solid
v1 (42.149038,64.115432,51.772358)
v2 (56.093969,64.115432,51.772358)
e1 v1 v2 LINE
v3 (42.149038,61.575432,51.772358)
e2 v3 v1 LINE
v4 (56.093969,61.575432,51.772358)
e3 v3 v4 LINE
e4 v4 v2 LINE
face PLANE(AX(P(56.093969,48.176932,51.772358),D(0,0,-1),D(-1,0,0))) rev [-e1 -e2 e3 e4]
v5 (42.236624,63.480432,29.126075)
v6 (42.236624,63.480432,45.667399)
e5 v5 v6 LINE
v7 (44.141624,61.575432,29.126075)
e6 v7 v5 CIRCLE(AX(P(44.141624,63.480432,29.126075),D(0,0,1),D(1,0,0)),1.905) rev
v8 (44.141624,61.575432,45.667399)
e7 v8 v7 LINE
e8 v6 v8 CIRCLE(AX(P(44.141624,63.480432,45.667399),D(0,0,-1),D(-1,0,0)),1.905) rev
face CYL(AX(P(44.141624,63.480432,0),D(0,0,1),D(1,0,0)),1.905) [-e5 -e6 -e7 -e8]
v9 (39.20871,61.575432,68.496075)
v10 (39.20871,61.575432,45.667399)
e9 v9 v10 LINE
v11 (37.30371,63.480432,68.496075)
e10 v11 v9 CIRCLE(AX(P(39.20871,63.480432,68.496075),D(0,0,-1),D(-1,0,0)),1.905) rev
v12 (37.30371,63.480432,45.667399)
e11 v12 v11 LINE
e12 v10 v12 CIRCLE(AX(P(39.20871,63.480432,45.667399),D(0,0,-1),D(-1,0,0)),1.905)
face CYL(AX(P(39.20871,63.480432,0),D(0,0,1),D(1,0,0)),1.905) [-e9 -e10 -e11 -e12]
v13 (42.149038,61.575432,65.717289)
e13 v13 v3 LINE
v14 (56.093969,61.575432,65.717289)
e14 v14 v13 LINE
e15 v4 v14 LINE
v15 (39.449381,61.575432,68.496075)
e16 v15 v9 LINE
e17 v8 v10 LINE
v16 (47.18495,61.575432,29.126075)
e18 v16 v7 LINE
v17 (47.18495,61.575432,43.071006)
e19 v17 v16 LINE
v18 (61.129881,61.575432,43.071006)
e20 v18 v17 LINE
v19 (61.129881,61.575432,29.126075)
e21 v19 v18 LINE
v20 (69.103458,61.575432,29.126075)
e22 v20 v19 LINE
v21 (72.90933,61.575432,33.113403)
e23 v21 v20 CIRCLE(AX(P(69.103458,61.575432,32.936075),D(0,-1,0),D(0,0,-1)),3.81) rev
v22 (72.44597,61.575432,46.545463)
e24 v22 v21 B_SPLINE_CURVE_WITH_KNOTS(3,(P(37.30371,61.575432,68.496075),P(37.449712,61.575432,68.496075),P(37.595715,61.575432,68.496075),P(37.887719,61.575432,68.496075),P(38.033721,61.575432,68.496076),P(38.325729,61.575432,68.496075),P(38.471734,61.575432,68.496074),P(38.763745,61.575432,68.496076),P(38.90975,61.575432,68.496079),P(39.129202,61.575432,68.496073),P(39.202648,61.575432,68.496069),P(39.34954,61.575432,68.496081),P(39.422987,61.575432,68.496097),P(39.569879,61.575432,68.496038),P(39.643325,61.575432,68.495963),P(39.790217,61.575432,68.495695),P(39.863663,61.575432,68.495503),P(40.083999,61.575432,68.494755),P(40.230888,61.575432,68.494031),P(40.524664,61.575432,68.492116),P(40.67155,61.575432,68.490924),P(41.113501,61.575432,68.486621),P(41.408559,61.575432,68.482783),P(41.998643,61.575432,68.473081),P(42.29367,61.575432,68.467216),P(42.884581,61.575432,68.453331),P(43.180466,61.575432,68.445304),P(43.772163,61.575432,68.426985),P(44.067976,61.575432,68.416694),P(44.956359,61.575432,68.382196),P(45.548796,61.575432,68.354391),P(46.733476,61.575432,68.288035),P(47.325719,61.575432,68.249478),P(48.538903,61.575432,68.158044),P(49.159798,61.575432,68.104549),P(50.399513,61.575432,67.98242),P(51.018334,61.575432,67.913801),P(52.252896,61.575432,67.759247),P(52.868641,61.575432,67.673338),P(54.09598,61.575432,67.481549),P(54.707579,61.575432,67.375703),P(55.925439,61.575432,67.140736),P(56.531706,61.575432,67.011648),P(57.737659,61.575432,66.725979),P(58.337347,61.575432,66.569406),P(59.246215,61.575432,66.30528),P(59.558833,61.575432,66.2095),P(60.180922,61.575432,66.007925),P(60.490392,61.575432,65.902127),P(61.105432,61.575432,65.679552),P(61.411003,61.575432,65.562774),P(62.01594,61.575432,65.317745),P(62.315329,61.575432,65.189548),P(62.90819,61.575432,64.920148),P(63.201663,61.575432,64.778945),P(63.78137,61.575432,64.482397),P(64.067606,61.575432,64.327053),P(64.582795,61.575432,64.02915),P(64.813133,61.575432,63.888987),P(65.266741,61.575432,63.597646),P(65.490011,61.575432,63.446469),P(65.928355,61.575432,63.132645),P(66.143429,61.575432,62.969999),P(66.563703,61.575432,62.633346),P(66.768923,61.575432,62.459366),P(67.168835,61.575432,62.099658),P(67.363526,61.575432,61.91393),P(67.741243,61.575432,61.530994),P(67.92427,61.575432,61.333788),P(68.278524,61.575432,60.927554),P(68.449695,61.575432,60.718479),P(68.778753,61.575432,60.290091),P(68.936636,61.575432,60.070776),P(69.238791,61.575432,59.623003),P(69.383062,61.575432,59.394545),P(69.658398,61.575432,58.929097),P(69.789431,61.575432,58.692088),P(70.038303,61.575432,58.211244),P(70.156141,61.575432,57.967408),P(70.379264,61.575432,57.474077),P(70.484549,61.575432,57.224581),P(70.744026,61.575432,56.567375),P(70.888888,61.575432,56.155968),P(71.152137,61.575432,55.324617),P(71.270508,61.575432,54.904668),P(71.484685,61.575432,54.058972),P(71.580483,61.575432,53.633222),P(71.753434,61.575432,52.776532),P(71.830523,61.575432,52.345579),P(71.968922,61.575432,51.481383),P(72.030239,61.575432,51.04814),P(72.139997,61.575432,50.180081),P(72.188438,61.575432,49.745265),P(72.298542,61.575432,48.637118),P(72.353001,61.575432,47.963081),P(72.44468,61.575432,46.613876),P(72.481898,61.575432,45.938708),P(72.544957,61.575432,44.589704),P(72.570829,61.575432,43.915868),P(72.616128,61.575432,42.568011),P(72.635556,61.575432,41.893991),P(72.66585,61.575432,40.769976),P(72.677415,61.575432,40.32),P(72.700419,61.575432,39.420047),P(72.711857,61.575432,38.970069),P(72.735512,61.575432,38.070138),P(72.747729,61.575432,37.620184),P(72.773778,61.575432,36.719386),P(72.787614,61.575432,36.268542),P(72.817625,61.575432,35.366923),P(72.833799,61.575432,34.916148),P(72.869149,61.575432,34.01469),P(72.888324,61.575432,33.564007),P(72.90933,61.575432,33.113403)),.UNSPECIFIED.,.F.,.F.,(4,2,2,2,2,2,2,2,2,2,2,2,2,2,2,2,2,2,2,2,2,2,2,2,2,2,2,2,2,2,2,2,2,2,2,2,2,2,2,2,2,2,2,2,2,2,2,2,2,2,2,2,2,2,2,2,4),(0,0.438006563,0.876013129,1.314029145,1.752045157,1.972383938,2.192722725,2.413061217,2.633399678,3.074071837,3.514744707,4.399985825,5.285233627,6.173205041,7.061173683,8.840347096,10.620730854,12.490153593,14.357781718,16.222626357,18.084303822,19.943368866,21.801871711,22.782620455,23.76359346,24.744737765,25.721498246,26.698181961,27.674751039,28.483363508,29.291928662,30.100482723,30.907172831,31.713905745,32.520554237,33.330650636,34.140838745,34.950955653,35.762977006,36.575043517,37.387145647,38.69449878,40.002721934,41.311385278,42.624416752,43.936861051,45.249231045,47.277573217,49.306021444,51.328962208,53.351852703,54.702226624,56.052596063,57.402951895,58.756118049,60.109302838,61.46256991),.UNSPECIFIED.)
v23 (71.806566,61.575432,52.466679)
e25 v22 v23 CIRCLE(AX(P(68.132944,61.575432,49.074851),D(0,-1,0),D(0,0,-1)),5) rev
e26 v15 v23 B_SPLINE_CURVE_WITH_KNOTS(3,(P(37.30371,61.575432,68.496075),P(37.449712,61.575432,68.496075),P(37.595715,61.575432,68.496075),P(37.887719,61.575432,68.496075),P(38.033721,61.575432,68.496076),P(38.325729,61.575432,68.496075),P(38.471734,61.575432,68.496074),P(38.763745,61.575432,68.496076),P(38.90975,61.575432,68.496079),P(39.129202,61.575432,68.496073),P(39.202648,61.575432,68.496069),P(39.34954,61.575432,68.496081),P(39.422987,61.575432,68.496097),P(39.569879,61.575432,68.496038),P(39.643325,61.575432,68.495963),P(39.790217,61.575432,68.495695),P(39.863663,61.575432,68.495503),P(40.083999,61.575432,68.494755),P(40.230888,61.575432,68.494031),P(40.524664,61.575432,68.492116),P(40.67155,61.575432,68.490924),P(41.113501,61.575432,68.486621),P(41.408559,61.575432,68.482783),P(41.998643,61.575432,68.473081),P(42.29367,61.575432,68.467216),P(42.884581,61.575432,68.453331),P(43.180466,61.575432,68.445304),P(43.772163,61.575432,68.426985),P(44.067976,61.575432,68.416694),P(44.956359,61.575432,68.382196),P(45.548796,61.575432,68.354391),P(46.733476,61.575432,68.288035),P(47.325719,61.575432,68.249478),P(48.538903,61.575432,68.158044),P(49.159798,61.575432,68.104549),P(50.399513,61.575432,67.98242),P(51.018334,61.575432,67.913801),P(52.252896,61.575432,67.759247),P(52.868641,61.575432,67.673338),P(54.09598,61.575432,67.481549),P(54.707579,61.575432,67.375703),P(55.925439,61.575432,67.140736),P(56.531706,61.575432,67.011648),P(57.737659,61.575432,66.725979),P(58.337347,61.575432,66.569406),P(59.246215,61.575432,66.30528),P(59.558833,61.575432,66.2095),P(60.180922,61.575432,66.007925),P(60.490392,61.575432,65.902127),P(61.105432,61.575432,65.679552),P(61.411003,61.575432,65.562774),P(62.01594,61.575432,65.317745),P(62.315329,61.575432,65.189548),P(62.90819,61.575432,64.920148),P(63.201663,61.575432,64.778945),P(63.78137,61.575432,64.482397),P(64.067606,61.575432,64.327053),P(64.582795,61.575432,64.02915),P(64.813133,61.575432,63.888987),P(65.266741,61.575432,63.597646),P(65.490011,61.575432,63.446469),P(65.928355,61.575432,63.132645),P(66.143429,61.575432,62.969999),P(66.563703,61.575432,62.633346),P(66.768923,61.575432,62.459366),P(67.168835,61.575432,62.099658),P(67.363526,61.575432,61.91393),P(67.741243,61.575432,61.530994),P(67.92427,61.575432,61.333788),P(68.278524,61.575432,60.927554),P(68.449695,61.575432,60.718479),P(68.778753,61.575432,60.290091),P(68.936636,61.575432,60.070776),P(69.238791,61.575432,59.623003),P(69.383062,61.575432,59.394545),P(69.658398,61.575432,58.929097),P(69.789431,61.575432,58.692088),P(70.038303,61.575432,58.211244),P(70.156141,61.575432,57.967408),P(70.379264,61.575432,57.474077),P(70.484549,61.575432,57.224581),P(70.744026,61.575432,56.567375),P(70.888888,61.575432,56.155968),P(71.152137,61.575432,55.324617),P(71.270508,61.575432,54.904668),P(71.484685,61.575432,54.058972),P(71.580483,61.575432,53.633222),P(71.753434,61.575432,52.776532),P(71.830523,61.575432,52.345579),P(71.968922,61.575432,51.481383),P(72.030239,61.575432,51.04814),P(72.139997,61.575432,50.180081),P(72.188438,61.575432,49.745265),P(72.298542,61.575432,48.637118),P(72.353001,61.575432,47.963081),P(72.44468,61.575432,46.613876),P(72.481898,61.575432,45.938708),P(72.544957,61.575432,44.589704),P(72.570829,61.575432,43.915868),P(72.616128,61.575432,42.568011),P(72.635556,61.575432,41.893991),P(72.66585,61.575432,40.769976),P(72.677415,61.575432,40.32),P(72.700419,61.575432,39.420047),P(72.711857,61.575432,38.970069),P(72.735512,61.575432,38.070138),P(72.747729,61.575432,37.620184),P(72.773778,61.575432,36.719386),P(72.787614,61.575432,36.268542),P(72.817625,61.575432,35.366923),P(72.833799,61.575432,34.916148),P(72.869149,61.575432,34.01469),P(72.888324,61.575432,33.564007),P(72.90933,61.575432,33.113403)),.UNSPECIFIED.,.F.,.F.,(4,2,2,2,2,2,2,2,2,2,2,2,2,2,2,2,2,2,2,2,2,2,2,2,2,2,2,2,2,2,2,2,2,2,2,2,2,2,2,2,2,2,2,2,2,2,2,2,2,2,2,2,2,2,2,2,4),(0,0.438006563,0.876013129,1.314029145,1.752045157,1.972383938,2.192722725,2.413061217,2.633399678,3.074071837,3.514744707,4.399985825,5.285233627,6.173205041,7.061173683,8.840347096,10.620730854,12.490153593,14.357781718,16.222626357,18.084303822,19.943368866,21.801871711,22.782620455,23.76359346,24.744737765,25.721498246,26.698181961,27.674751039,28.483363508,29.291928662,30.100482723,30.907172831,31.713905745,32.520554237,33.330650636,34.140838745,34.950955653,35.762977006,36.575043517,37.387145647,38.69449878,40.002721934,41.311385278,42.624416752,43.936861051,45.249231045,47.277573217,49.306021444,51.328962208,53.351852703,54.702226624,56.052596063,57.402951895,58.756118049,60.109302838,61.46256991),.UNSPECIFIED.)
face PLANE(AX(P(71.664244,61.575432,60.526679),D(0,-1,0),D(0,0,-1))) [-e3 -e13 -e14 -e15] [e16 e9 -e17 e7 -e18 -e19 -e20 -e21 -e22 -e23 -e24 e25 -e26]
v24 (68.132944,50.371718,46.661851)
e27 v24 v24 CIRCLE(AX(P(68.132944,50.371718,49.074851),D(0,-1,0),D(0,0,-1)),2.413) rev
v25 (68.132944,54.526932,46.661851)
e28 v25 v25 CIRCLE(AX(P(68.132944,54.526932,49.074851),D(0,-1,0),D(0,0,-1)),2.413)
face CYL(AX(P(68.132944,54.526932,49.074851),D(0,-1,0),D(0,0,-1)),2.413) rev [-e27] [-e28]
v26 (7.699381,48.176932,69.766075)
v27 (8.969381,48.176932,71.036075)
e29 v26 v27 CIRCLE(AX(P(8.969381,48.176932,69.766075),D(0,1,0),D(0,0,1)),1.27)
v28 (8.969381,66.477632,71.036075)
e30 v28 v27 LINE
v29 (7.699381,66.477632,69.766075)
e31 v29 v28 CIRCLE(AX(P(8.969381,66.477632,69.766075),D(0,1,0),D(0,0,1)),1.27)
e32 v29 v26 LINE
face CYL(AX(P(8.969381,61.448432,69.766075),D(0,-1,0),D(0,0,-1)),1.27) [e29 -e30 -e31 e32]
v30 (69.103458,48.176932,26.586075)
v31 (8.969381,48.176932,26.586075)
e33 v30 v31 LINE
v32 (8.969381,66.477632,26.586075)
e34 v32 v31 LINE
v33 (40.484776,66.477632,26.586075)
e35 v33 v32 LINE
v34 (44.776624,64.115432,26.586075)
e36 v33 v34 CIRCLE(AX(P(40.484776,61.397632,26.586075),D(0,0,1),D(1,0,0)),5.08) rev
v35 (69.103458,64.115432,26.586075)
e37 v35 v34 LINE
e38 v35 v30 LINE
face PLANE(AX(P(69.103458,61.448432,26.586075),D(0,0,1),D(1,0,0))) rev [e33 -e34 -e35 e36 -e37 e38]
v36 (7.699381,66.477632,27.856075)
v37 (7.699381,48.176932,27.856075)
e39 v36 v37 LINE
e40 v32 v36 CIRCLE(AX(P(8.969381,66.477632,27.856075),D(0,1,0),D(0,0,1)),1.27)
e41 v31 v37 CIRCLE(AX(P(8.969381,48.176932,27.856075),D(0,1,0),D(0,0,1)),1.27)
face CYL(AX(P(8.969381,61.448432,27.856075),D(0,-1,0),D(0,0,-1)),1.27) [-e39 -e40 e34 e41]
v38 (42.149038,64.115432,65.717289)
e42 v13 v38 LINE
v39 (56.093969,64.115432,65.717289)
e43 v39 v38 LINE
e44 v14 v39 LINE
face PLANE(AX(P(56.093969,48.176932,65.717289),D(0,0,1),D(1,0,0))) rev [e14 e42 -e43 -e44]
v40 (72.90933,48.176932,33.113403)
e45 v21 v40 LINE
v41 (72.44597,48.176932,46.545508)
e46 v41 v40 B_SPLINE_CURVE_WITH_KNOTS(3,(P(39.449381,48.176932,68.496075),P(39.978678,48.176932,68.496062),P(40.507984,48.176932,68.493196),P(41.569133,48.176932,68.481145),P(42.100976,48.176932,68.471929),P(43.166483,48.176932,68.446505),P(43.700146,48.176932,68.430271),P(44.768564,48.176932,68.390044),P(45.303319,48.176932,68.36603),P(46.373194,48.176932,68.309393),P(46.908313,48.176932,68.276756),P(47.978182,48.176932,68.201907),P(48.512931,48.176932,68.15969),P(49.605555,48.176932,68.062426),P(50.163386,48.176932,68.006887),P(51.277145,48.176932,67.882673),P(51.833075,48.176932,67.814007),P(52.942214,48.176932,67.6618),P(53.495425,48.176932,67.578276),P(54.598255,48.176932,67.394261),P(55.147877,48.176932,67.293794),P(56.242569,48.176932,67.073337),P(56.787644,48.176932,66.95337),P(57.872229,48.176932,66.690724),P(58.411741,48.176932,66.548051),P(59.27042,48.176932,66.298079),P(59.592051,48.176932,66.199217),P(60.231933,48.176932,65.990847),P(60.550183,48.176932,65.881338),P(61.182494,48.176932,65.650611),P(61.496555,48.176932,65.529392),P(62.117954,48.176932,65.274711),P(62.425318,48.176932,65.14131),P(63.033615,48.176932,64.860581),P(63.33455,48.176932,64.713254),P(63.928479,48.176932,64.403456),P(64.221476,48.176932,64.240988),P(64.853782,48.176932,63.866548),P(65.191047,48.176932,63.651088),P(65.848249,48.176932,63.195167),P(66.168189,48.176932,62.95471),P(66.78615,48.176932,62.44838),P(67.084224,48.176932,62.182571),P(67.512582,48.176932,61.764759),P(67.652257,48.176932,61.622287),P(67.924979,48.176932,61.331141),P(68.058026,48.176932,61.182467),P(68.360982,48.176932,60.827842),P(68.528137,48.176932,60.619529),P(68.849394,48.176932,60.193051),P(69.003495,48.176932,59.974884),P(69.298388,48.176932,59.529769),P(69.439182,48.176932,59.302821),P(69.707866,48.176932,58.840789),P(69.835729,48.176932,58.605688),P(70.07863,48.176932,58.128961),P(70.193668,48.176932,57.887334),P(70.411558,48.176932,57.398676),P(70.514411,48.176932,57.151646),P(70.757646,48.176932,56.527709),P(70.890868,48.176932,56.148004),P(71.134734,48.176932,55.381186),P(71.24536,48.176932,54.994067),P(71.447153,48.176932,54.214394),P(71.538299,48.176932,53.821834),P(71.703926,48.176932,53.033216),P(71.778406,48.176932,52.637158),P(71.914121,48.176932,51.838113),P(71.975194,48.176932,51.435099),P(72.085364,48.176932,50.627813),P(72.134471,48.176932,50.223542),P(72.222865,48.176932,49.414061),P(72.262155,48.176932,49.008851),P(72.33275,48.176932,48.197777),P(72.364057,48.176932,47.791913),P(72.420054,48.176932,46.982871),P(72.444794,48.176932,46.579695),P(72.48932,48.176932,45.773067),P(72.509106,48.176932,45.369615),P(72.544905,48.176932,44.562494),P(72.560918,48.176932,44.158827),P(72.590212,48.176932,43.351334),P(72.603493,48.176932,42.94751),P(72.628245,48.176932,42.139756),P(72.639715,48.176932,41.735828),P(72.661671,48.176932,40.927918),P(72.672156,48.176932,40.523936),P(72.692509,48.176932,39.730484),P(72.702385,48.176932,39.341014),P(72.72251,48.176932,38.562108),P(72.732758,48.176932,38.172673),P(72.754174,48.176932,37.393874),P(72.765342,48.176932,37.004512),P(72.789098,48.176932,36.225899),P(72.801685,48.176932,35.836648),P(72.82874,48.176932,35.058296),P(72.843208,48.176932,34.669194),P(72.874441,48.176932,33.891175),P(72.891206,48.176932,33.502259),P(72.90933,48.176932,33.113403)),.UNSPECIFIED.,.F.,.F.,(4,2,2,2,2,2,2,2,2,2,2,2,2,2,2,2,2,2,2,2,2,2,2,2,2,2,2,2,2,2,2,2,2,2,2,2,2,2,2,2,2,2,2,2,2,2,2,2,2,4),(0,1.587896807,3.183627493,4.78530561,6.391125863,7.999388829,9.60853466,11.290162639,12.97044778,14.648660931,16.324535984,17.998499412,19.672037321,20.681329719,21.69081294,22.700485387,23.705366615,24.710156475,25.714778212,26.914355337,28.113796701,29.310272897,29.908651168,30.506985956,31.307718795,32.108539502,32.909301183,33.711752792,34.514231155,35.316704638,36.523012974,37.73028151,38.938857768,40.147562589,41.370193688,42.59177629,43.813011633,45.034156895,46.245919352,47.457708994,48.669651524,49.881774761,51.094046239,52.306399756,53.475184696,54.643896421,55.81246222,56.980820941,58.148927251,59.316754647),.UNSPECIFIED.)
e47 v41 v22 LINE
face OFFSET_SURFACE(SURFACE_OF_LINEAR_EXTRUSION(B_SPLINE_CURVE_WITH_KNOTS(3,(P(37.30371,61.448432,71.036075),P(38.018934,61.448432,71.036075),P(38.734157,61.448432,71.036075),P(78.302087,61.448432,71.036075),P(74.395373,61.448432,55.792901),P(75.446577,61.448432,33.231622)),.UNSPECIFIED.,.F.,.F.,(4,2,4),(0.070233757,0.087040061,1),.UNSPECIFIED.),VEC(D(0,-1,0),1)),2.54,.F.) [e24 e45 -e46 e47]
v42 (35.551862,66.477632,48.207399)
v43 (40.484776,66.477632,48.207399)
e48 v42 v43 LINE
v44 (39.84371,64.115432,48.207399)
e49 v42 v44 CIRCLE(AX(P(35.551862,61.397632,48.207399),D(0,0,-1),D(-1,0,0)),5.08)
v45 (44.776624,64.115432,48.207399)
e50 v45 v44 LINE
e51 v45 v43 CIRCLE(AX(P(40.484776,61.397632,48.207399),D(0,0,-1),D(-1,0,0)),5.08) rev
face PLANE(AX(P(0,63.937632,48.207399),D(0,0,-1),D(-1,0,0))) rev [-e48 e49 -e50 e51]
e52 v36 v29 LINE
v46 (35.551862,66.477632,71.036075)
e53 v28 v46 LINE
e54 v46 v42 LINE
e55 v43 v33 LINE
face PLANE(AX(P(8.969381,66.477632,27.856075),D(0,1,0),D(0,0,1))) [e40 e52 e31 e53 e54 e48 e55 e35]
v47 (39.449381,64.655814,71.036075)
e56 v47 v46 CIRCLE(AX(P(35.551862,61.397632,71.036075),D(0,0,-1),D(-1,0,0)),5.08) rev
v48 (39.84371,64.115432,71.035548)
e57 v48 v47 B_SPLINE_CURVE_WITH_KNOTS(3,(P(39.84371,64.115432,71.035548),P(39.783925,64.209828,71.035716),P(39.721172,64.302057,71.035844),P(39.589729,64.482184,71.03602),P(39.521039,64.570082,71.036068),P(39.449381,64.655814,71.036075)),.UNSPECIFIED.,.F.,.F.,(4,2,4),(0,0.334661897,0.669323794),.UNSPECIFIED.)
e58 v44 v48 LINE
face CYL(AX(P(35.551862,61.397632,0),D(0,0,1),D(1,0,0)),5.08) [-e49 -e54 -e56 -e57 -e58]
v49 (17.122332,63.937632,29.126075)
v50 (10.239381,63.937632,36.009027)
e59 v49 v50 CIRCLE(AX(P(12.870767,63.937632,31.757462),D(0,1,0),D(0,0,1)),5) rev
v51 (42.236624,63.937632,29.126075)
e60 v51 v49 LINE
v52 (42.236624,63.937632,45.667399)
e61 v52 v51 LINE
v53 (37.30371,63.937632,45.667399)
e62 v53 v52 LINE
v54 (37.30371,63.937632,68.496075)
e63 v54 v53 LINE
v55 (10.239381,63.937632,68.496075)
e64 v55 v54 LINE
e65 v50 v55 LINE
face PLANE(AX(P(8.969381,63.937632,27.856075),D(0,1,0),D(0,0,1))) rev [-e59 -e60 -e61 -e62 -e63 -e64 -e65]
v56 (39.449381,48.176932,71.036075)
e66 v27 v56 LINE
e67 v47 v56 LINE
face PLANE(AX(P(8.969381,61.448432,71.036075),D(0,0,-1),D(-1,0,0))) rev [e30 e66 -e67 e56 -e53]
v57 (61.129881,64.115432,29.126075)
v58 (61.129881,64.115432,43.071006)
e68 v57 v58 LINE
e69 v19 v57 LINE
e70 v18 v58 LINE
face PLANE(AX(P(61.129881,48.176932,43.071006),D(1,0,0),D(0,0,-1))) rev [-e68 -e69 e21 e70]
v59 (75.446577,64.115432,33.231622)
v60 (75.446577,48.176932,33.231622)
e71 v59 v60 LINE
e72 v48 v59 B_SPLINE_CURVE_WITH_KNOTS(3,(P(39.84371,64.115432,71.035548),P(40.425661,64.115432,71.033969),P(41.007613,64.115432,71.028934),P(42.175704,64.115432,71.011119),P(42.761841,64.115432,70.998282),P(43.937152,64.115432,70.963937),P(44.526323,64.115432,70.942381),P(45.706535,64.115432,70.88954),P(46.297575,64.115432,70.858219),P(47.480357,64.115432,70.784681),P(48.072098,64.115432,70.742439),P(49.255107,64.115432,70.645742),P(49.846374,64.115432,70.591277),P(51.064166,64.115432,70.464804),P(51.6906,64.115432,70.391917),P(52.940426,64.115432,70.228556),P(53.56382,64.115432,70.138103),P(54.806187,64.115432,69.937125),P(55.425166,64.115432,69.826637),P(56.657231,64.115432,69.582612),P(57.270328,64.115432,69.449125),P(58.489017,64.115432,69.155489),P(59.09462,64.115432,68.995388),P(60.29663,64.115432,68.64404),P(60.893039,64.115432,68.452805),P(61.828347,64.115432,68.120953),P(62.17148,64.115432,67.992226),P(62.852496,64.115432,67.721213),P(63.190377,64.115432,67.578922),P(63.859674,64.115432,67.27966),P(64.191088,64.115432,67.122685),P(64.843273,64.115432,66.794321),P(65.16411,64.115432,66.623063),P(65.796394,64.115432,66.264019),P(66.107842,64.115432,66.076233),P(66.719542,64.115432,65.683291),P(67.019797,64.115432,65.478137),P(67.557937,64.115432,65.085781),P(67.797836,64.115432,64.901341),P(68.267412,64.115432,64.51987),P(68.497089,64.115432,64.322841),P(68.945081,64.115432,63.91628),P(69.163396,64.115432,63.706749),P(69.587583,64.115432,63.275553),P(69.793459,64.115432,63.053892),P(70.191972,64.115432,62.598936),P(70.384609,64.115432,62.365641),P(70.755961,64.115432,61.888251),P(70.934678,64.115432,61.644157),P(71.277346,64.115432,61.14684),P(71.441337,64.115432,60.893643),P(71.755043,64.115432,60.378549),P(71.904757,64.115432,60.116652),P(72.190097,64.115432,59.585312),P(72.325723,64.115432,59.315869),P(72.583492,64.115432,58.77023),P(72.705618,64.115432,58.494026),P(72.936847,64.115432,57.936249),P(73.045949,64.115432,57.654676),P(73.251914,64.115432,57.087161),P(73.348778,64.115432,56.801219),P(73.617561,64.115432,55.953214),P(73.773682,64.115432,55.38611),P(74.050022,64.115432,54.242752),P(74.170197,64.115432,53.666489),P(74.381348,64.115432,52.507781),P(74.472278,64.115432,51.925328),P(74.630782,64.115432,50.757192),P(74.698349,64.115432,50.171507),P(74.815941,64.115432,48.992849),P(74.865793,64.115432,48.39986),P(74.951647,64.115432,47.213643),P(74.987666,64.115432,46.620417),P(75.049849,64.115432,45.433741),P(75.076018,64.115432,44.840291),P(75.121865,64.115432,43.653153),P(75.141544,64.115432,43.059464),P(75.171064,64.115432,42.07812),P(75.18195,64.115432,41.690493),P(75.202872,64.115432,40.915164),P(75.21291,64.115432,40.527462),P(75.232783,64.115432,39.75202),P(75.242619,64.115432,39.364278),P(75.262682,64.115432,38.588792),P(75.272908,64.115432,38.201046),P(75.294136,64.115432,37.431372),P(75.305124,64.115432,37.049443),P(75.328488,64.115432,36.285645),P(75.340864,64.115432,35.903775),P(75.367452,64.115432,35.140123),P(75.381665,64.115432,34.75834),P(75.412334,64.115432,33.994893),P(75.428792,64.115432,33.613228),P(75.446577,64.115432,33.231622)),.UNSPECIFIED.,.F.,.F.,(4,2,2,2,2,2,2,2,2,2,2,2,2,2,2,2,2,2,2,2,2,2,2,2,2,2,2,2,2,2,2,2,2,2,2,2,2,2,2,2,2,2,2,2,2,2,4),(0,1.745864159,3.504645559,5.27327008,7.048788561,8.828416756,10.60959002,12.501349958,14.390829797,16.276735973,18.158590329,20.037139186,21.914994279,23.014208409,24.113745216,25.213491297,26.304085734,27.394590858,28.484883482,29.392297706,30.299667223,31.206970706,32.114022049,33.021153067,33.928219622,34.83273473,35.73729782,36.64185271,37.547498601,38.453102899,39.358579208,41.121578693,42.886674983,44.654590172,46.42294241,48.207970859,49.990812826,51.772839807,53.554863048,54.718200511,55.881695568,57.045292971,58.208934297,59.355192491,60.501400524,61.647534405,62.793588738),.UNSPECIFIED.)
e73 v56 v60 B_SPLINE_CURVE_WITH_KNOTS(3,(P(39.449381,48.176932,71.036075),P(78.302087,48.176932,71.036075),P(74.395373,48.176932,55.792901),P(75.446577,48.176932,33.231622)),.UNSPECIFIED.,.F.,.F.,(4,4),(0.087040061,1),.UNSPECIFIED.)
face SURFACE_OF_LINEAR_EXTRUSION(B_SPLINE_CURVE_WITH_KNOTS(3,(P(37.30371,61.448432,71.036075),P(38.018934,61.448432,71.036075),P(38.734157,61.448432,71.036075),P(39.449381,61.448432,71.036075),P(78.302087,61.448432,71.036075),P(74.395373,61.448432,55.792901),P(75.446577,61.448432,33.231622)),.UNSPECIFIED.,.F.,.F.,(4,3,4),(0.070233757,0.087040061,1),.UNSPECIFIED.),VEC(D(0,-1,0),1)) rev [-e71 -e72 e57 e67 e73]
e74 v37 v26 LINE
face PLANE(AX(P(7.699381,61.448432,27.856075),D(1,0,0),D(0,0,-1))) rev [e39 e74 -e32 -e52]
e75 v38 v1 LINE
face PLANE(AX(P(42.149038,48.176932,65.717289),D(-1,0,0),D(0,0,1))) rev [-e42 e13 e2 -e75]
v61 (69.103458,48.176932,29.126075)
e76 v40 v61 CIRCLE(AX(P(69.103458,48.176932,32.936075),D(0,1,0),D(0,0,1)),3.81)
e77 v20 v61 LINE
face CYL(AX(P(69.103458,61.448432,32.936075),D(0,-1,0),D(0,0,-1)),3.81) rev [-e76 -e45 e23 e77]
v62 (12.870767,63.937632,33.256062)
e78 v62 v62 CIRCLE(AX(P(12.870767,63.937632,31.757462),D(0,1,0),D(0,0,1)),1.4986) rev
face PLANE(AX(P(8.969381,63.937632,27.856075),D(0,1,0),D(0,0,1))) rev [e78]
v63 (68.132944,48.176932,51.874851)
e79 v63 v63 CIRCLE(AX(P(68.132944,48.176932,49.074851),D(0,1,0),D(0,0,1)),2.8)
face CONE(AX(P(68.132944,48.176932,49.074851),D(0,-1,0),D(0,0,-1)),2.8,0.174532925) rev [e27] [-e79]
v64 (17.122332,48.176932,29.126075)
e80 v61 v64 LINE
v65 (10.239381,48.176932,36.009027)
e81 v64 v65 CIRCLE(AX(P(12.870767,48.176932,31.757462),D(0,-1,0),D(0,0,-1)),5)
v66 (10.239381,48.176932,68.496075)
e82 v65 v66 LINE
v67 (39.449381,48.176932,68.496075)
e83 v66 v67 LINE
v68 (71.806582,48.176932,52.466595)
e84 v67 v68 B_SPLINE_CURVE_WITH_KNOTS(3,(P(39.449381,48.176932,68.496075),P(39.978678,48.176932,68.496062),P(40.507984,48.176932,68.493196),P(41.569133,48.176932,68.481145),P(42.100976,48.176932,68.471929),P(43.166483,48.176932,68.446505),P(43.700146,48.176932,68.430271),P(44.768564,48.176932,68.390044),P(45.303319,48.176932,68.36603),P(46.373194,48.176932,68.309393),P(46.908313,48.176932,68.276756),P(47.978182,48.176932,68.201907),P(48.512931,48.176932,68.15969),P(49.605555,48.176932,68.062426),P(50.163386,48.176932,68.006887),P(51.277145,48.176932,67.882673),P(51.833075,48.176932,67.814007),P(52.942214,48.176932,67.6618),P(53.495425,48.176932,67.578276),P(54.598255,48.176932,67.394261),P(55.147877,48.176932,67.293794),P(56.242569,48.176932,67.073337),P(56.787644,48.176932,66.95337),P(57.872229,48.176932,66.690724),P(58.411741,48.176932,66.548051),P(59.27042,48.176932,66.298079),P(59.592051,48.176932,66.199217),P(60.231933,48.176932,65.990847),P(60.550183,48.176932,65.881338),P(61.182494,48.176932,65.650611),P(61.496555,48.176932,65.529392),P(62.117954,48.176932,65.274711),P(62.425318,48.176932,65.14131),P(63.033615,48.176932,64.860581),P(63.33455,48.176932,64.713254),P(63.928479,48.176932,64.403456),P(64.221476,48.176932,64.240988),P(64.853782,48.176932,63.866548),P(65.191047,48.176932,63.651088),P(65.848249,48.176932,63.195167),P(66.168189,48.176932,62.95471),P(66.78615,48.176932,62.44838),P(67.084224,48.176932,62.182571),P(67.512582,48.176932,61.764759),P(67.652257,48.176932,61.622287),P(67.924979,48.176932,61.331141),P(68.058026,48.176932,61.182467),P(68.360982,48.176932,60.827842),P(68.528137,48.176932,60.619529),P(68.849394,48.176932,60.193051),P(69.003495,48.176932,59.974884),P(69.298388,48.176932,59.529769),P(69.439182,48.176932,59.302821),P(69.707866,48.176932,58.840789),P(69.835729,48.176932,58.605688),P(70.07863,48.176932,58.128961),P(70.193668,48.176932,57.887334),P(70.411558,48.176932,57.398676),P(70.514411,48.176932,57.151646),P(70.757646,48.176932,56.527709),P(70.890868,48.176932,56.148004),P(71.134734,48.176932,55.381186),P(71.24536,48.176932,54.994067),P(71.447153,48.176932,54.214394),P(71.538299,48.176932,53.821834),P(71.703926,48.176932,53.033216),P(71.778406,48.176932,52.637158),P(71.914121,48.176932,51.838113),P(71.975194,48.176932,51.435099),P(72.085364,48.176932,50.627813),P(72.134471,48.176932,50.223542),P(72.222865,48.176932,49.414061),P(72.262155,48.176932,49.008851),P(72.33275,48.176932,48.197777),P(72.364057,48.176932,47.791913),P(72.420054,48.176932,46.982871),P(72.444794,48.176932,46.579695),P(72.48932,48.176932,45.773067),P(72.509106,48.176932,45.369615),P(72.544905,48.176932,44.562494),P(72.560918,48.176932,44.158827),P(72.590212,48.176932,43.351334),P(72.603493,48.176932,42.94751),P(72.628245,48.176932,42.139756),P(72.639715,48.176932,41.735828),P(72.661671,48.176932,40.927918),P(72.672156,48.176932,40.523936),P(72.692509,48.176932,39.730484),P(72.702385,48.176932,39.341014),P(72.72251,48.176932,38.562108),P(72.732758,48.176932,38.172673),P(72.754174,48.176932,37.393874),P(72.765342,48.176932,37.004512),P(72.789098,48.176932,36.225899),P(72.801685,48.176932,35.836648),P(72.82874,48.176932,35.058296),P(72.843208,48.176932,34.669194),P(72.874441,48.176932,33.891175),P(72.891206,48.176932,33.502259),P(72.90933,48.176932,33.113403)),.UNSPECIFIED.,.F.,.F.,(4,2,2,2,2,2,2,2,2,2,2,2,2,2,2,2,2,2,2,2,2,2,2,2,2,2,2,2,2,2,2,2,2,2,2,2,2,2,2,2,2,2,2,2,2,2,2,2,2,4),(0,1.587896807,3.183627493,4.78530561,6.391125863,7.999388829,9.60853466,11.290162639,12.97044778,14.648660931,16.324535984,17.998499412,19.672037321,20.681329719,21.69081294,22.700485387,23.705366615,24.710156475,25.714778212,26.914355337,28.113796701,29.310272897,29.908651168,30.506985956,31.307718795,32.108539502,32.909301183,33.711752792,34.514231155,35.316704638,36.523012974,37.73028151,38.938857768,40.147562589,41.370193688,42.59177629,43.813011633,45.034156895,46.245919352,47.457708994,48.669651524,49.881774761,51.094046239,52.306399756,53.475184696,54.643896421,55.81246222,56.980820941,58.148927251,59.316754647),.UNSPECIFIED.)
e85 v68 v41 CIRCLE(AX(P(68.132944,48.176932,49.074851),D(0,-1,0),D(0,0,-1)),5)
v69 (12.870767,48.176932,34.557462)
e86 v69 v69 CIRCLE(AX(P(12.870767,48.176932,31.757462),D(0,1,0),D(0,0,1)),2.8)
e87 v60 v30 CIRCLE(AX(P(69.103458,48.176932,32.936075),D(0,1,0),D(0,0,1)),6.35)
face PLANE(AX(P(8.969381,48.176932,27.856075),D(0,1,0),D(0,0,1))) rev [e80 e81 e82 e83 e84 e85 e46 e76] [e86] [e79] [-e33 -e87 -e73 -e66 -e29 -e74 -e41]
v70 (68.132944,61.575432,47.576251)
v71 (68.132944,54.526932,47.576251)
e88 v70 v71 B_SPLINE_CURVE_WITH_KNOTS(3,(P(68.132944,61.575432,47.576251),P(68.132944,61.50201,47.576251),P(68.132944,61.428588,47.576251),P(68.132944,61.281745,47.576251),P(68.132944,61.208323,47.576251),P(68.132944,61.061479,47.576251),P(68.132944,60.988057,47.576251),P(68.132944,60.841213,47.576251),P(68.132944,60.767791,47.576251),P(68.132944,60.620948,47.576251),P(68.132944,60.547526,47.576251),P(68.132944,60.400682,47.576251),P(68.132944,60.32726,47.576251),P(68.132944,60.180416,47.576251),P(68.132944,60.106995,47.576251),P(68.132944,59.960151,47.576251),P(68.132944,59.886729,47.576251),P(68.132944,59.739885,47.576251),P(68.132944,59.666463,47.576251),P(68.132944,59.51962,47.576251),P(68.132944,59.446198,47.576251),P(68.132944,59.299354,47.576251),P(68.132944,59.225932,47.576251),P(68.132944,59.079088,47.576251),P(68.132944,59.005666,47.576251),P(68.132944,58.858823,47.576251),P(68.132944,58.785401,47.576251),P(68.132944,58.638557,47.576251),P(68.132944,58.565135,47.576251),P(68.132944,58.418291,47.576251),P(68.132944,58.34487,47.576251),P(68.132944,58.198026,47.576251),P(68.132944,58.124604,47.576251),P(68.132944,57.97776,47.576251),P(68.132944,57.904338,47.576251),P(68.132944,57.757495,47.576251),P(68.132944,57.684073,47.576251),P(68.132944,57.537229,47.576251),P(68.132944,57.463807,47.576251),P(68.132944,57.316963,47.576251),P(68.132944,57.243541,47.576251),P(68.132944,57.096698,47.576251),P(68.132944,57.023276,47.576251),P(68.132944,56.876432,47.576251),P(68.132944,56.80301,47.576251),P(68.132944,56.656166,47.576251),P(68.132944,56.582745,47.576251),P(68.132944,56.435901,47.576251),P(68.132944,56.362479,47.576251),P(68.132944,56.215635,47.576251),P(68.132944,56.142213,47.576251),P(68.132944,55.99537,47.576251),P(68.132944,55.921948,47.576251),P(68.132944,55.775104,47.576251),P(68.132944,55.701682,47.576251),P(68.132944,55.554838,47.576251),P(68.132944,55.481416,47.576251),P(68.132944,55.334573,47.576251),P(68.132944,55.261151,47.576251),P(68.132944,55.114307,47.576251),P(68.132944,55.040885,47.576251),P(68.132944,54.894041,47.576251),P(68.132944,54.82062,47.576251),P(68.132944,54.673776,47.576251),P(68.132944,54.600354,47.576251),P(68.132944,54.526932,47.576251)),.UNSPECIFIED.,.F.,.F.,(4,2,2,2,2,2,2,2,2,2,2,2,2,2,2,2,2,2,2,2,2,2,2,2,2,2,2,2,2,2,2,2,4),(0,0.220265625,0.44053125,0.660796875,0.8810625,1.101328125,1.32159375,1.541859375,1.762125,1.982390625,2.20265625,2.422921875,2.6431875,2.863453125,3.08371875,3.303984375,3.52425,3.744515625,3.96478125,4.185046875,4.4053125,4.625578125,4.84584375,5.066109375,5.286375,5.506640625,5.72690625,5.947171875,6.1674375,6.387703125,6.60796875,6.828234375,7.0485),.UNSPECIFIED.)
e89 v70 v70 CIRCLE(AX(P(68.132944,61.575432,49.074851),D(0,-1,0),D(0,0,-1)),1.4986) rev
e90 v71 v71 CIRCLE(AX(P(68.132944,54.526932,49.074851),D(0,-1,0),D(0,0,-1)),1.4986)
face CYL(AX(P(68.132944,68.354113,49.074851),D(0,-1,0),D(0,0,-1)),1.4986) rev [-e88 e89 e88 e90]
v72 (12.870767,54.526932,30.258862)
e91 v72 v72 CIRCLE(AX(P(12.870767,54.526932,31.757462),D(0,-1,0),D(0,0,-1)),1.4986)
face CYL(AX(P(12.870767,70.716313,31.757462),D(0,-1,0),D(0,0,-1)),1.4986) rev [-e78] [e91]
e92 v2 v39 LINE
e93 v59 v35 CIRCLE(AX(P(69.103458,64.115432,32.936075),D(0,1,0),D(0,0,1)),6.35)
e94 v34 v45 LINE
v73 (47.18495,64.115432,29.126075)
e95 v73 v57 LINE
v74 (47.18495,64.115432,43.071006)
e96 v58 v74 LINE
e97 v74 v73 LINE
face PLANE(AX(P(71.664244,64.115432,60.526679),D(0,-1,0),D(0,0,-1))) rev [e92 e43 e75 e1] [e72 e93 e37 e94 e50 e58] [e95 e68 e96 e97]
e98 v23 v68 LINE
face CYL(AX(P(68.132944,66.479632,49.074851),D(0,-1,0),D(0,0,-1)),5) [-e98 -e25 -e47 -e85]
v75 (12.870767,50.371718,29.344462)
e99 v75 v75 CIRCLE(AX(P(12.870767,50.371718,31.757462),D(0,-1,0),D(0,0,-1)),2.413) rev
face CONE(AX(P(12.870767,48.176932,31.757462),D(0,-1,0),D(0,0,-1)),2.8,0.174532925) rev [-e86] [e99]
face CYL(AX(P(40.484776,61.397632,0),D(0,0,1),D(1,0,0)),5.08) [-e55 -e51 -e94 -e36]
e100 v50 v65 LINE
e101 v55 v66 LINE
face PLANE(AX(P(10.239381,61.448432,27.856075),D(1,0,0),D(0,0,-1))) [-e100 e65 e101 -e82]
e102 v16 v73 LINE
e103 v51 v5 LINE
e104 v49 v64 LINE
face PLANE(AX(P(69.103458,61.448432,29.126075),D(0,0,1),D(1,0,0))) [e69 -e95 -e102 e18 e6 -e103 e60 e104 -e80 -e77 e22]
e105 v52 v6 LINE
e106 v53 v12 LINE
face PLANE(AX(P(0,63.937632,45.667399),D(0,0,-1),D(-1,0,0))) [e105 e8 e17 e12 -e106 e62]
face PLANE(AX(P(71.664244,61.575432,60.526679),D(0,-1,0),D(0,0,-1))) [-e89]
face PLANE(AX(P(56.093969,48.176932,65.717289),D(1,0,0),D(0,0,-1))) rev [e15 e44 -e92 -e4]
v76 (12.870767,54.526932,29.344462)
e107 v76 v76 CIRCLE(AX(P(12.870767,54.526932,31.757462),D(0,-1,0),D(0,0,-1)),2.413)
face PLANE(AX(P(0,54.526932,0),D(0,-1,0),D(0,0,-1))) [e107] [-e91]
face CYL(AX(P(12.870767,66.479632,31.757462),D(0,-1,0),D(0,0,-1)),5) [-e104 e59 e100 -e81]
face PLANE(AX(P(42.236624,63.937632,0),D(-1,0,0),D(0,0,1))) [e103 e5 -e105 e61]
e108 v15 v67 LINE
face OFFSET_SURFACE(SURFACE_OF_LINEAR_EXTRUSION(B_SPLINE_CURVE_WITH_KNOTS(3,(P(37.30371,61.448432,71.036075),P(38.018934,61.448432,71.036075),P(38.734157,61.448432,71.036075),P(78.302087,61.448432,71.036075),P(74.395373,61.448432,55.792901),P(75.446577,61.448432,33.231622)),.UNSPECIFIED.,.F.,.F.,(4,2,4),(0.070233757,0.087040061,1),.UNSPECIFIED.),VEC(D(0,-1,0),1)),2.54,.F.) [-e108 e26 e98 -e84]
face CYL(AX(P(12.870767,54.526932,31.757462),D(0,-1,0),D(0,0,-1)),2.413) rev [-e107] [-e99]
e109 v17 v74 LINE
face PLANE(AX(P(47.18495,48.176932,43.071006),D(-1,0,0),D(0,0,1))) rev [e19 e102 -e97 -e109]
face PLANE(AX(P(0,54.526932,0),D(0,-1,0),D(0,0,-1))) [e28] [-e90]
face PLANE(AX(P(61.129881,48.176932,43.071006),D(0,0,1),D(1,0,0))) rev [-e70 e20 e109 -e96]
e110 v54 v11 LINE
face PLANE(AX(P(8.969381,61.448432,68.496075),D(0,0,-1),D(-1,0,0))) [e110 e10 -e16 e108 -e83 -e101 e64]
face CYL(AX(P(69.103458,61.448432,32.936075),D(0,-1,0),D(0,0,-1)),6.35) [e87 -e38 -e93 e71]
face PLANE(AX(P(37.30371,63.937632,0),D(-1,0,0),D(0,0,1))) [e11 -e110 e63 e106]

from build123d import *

# Parameters (mm, degrees)
BUTTONHEIGHTADJUSTMENT_DEPTH          = 13.2715
DUPONTCONNECTORHEIGHTADJUSTMENT_DEPTH = 2.4892
ADDINGTOPTHICKNESS_DUPONT_DEPTH       = 2.54
ADDINGTOPTHICKNESS_BUTTON_DEPTH       = 2.667
SHELL1_START                          = 48.176932074
SHELL1_DEPTH                          = 13.3985
SHELL1_START_2                        = 61.575432074
SHELL1_2_DEPTH                        = 2.3622
BUTTONOPENINGS_DEPTH                  = 105.849340515
BUTTONOPENINGS_DEPTH_BACK             = 105.849340515
SKETCH4_W                             = 13.944930934
SKETCH4_H                             = 13.944930934
SKETCH4_W_2                           = 13.944930933
FILLET1_R                             = 5.08
FILLET2_R                             = 5.08
FILLET3_R                             = 1.905
BOSS_EXTRUDE5_REACH                   = 107.234
SKETCH7_R                             = 5
SKETCH7_3_R                           = 2.413
CUT_EXTRUDE2_DEPTH                    = 6.35
SKETCH8_R                             = 1.4986
CUT_EXTRUDE3_DEPTH                    = 9.4107
SKETCH8_3_R                           = 1.4986
CUT_EXTRUDE4_DEPTH                    = 7.0485


# Read off the part's stored shape, not the designer's step: Shell1
with BuildPart() as part:
    # Sketch1 → ButtonHeightAdjustment (new body)
    with BuildSketch(Plane(origin=(0, 48.176932074, 0), x_dir=(1, 0, 0), z_dir=(0, 1, 0))):
        with BuildLine():
            Line((7.699380634, -27.856075324), (7.699380634, -69.766075324))
            ThreePointArc((7.699380634, -69.766075324), (8.071355022, -70.664100937), (8.969380634, -71.036075324))
            Line((8.969380634, -71.036075324), (39.449380634, -71.036075324))
            add(Edge.make_bspline(
                [(39.449380634, -71.036075324), (78.302087084, -71.036075324), (74.39537319, -55.792900821), (75.446576955, -33.231621959)],
                knots=[0.087040061, 0.087040061, 0.087040061, 0.087040061, 1, 1, 1, 1], degree=3))
            ThreePointArc((75.446576955, -33.231621959), (73.696889706, -28.551683755), (69.103458465, -26.586075324))
            Line((69.103458465, -26.586075324), (8.969380634, -26.586075324))
            ThreePointArc((8.969380634, -26.586075324), (8.071355022, -26.958049712), (7.699380634, -27.856075324))
        make_face()
    extrude(amount=BUTTONHEIGHTADJUSTMENT_DEPTH)

    # Sketch2 → DupontConnectorHeightAdjustment (add)
    with BuildSketch(Plane(origin=(0, 61.448432074, 0), x_dir=(1, 0, 0), z_dir=(0, 1, 0))):
        with BuildLine():
            add(Edge.make_bspline(
                [(39.449380634, -71.036075324), (39.581316275, -71.036075324), (39.712758839, -71.035899549), (39.843710197, -71.03554831)],
                knots=[0.087040061, 0.087040061, 0.087040061, 0.087040061, 0.090140281, 0.090140281, 0.090140281, 0.090140281], degree=3))
            Line((39.843710197, -71.03554831), (39.843710197, -48.207398996))
            Line((39.843710197, -48.207398996), (44.776624411, -48.207398996))
            Line((44.776624411, -48.207398996), (44.776624411, -26.586075324))
            Line((44.776624411, -26.586075324), (8.969380634, -26.586075324))
            ThreePointArc((8.969380634, -26.586075324), (8.071355022, -26.958049712), (7.699380634, -27.856075324))
            Line((7.699380634, -27.856075324), (7.699380634, -69.766075324))
            ThreePointArc((7.699380634, -69.766075324), (8.071355022, -70.664100937), (8.969380634, -71.036075324))
            Line((8.969380634, -71.036075324), (39.449380634, -71.036075324))
        make_face()
    extrude(amount=DUPONTCONNECTORHEIGHTADJUSTMENT_DEPTH)

    # Sketch3 → AddingTopThickness_Dupont (add)
    with BuildSketch(Plane(origin=(0, 63.937632074, 0), x_dir=(1, 0, 0), z_dir=(0, 1, 0))):
        with BuildLine():
            Line((39.843710197, -48.207398996), (44.776624411, -48.207398996))
            Line((44.776624411, -48.207398996), (44.776624411, -26.586075324))
            Line((44.776624411, -26.586075324), (8.969380634, -26.586075324))
            ThreePointArc((8.969380634, -26.586075324), (8.071355022, -26.958049712), (7.699380634, -27.856075324))
            Line((7.699380634, -27.856075324), (7.699380634, -69.766075324))
            ThreePointArc((7.699380634, -69.766075324), (8.071355022, -70.664100937), (8.969380634, -71.036075324))
            Line((8.969380634, -71.036075324), (39.449380634, -71.036075324))
            add(Edge.make_bspline(
                [(39.449380634, -71.036075324), (39.581316276, -71.036075324), (39.712758842, -71.035899549), (39.8437102, -71.03554831)],
                knots=[0.087040061, 0.087040061, 0.087040061, 0.087040061, 0.090140281, 0.090140281, 0.090140281, 0.090140281], degree=3))
            Line((39.8437102, -71.03554831), (39.843710197, -48.207398996))
        make_face()
    extrude(amount=ADDINGTOPTHICKNESS_DUPONT_DEPTH)

    # Sketch5 → AddingTopThickness_Button (add)
    with BuildSketch(Plane(origin=(0, 61.448432074, 0), x_dir=(1, 0, 0), z_dir=(0, 1, 0))):
        with BuildLine():
            Line((39.843710197, -48.207398996), (39.8437102, -71.03554831))
            add(Edge.make_bspline(
                [(39.8437102, -71.03554831), (78.275611493, -70.93246569), (74.398942858, -55.71628745), (75.446576955, -33.231621959)],
                knots=[0.090140281, 0.090140281, 0.090140281, 0.090140281, 1, 1, 1, 1], degree=3))
            ThreePointArc((75.446576955, -33.231621959), (73.696889706, -28.551683755), (69.103458465, -26.586075324))
            Line((69.103458465, -26.586075324), (44.776624411, -26.586075324))
            Line((44.776624411, -26.586075324), (44.776624411, -48.207398996))
            Line((44.776624411, -48.207398996), (39.843710197, -48.207398996))
        make_face()
    extrude(amount=ADDINGTOPTHICKNESS_BUTTON_DEPTH)

    # Shell1 outline → Shell1 (cut)
    with BuildSketch(Plane(origin=(0, 0, 0), x_dir=(1, 0, 0), z_dir=(0, 1, 0)).offset(SHELL1_START)):
        with BuildLine():
            add(Edge.make_bspline(
                [(39.449379827, -68.496075324), (39.449586547, -68.496075324), (39.449791514, -68.496075324), (39.449995043, -68.496075324), (39.450199135, -68.496075323), (39.450405991, -68.496075321), (39.450613287, -68.49607532), (39.450814961, -68.496075318), (39.45101783, -68.496075316), (39.451228774, -68.496075313), (39.451429783, -68.49607531), (39.451635772, -68.496075307), (39.452137481, -68.496075299), (39.452434182, -68.496075293), (39.452730881, -68.496075287), (39.453027578, -68.49607528), (39.453324273, -68.496075272), (39.453620966, -68.496075264), (39.453917657, -68.496075255), (39.454214347, -68.496075245), (39.454511034, -68.496075235), (39.454807719, -68.496075224), (39.455104403, -68.496075212), (39.455994447, -68.496075176), (39.456587802, -68.496075149), (39.45718115, -68.496075119), (39.45777449, -68.496075087), (39.458367822, -68.496075051), (39.458961146, -68.496075014), (39.459554462, -68.496074974), (39.460147771, -68.496074931), (39.460741072, -68.496074885), (39.461334366, -68.496074837), (39.461927651, -68.496074786), (39.463707485, -68.496074626), (39.46489401, -68.496074509), (39.466080504, -68.496074381), (39.467266967, -68.496074242), (39.468453399, -68.496074094), (39.4696398, -68.496073934), (39.47082617, -68.496073764), (39.472012509, -68.496073584), (39.473198817, -68.496073393), (39.474385095, -68.496073191), (39.475571341, -68.496072979), (39.479129987, -68.496072311), (39.481502294, -68.496071824), (39.483874478, -68.496071295), (39.486246537, -68.496070723), (39.488618473, -68.49607011), (39.490990286, -68.496069454), (39.493361974, -68.496068756), (39.495733539, -68.496068017), (39.49810498, -68.496067235), (39.500476297, -68.496066411), (39.50284749, -68.496065545), (39.514702839, -68.496061004), (39.524185139, -68.496056698), (39.53366546, -68.496051718), (39.543143801, -68.496046066), (39.552620163, -68.49603974), (39.562094547, -68.496032741), (39.571566952, -68.496025069), (39.581037379, -68.496016724), (39.590505827, -68.496007706), (39.599972298, -68.495998014), (39.609436791, -68.49598765), (39.656749367, -68.495932466), (39.694567786, -68.495877552), (39.732354575, -68.495811875), (39.770109747, -68.495735439), (39.807833313, -68.495648246), (39.845525286, -68.495550299), (39.883185678, -68.495441603), (39.9208145, -68.495322159), (39.958411766, -68.495191972), (39.995977486, -68.495051044), (40.033511673, -68.494899378), (40.146019672, -68.494412178), (40.22089892, -68.49404444), (40.295652182, -68.49363379), (40.370279553, -68.493180254), (40.444781129, -68.492683856), (40.519157007, -68.492144625), (40.593407283, -68.491562584), (40.667532053, -68.49093776), (40.741531414, -68.490270178), (40.815405462, -68.489559865), (40.889154293, -68.488806846), (41.257272849, -68.484828347), (41.549765836, -68.480962528), (41.840263075, -68.476415439), (42.128770675, -68.471188833), (42.415294743, -68.46528446), (42.699841389, -68.458704073), (42.982416721, -68.451449422), (43.263026848, -68.443522258), (43.541677878, -68.434924334), (43.81837592, -68.425657399), (44.093127082, -68.415723207), (44.911558257, -68.383924109), (45.449415797, -68.360063452), (45.979558488, -68.333556107), (46.502034658, -68.304417105), (47.016892561, -68.272661946), (47.524180382, -68.238306591), (48.023946236, -68.201367465), (48.516238167, -68.161861458), (49.001104147, -68.119805924), (49.478592082, -68.075218681), (49.948749802, -68.028118011), (51.337375611, -67.879331956), (52.233996985, -67.770162893), (53.10187272, -67.65116783), (53.941387356, -67.522507203), (54.752927499, -67.384351455), (55.536883515, -67.23688237), (56.29365187, -67.080293824), (57.023638097, -66.914791937), (57.72726042, -66.740594643), (58.404954001, -66.557930666), (59.057175843, -66.367037906), (60.938879277, -65.770407902), (62.093404567, -65.34071881), (63.151826299, -64.881036106), (64.118529707, -64.39342752), (64.99834488, -63.879851847), (65.796921512, -63.342095032), (66.520883858, -62.781316869), (67.177505422, -62.197416382), (67.77398037, -61.588740771), (68.316609285, -60.952528366), (68.810360599, -60.285890342), (70.157226589, -58.18651634), (70.875939498, -56.654313157), (71.447642543, -54.967962519), (71.889256902, -53.108637628), (72.201031894, -51.080028633), (72.410024806, -48.90317794), (72.536553408, -46.578549842), (72.608216265, -44.123137631), (72.652402144, -41.540781475), (72.697717647, -38.840812898), (72.773461503, -36.029447938), (72.909329559, -33.113403305)],
                knots=[0.087040061, 0.087040061, 0.087040061, 0.087040061, 0.087040061, 0.087040061, 0.087040061, 0.087040061, 0.087040061, 0.087040061, 0.087040061, 0.087040061, 0.087040061, 0.087059666, 0.087059666, 0.087059666, 0.087059666, 0.087059666, 0.087059666, 0.087059666, 0.087059666, 0.087059666, 0.087059666, 0.087059666, 0.08708804, 0.08708804, 0.08708804, 0.08708804, 0.08708804, 0.08708804, 0.08708804, 0.08708804, 0.08708804, 0.08708804, 0.08708804, 0.087144789, 0.087144789, 0.087144789, 0.087144789, 0.087144789, 0.087144789, 0.087144789, 0.087144789, 0.087144789, 0.087144789, 0.087144789, 0.087258286, 0.087258286, 0.087258286, 0.087258286, 0.087258286, 0.087258286, 0.087258286, 0.087258286, 0.087258286, 0.087258286, 0.087258286, 0.087485279, 0.087485279, 0.087485279, 0.087485279, 0.087485279, 0.087485279, 0.087485279, 0.087485279, 0.087485279, 0.087485279, 0.087485279, 0.088393254, 0.088393254, 0.088393254, 0.088393254, 0.088393254, 0.088393254, 0.088393254, 0.088393254, 0.088393254, 0.088393254, 0.088393254, 0.092025154, 0.092025154, 0.092025154, 0.092025154, 0.092025154, 0.092025154, 0.092025154, 0.092025154, 0.092025154, 0.092025154, 0.092025154, 0.099288952, 0.099288952, 0.099288952, 0.099288952, 0.099288952, 0.099288952, 0.099288952, 0.099288952, 0.099288952, 0.099288952, 0.099288952, 0.128344147, 0.128344147, 0.128344147, 0.128344147, 0.128344147, 0.128344147, 0.128344147, 0.128344147, 0.128344147, 0.128344147, 0.128344147, 0.186454538, 0.186454538, 0.186454538, 0.186454538, 0.186454538, 0.186454538, 0.186454538, 0.186454538, 0.186454538, 0.186454538, 0.186454538, 0.302675318, 0.302675318, 0.302675318, 0.302675318, 0.302675318, 0.302675318, 0.302675318, 0.302675318, 0.302675318, 0.302675318, 0.302675318, 0.535116879, 0.535116879, 0.535116879, 0.535116879, 0.535116879, 0.535116879, 0.535116879, 0.535116879, 0.535116879, 0.535116879, 0.535116879, 1, 1, 1, 1, 1, 1, 1, 1, 1, 1, 1, 1, 1], degree=12))
            ThreePointArc((72.909329559, -33.113403305), (71.859517209, -30.305440383), (69.103458465, -29.126075324))
            Line((69.103458465, -29.126075324), (10.239380634, -29.126075324))
            Line((10.239380634, -29.126075324), (10.239380634, -68.496075324))
            Line((10.239380634, -68.496075324), (39.449379827, -68.496075324))
        make_face()
    extrude(amount=SHELL1_DEPTH, mode=Mode.SUBTRACT)

    # Shell1 2 outline → Shell1 2 (cut)
    with BuildSketch(Plane(origin=(0, 0, 0), x_dir=(1, 0, 0), z_dir=(0, 1, 0)).offset(SHELL1_START_2)):
        Polygon((10.239380634, -68.496075324), (37.303710197, -68.496075324), (37.303710197, -45.667398996), (42.236624411, -45.667398996), (42.236624411, -29.126075324), (10.239380634, -29.126075324), align=None)
    extrude(amount=SHELL1_2_DEPTH, mode=Mode.SUBTRACT)

    # Sketch4 → ButtonOpenings (cut, two sides: drawn at the far end of the back side and taken through both)
    with BuildSketch(Plane(origin=(0, 64.115432074, 0), x_dir=(1, 0, 0), z_dir=(0, 1, 0)).offset(-BUTTONOPENINGS_DEPTH_BACK)):
        with Locations((54.157415047, -36.098540791)):
            Rectangle(SKETCH4_W, SKETCH4_H)
        with Locations((49.121503178, -58.744823399)):
            Rectangle(SKETCH4_W_2, SKETCH4_H)
    extrude(amount=BUTTONOPENINGS_DEPTH + BUTTONOPENINGS_DEPTH_BACK, mode=Mode.SUBTRACT)

    # Fillet1
    # the kernel refuses this fillet: 5.08 mm, written as the material it takes off along each edge
    with BuildSketch(Plane(origin=(39.843710202, 66.477632074, 81.765169447), x_dir=(0, -1, 0), z_dir=(-1.4390201579738435e-10, 0, -1.0))) as fillet1_piece_1:
        with BuildLine():
            CenterArc((5.08, 4.291848455), FILLET1_R, 180, 57.656088587)
            Line((0, 4.291848455), (-0.1016, 4.291848455))
            Line((-0.1016, 4.291848455), (-0.1016, 0))
            Line((-0.1016, 0), (0, -0.1016))
            ThreePointArc((0, -0.1016), (1.1811, -0.1016), (2.307844, -0.085836969))
            Line((2.307844, -0.085836969), (2.3622, 0))
        make_face()
    extrude(amount=33.557770451, mode=Mode.SUBTRACT)

    # Fillet2
    # the kernel refuses this fillet: 5.08 mm, written as the material it takes off along each edge
    with BuildSketch(Plane(origin=(44.776624411, 66.477632074, 58.937020134), x_dir=(-1, 0, 0), z_dir=(0, 0, -1))) as fillet2_piece_1:
        with BuildLine():
            CenterArc((4.291848455, -5.08), FILLET2_R, 90, 57.656088587)
            Line((0, -2.3622), (-0.085836969, -2.307844))
            ThreePointArc((-0.085836969, -2.307844), (-0.1016, -1.1811), (-0.1016, 0))
            Line((-0.1016, 0), (0, 0.1016))
            Line((0, 0.1016), (4.291848455, 0.1016))
            Line((4.291848455, 0.1016), (4.291848455, 0))
        make_face()
    extrude(amount=43.080565947, mode=Mode.SUBTRACT)

    # Fillet3
    fillet3_edges = [part.edges().sort_by_distance(p)[0] for p in [
        (37.303710197, 61.575432074, 57.08173716),
        (42.236624411, 61.575432074, 37.39673716),
    ]]
    fillet(fillet3_edges, radius=FILLET3_R)

    # Sketch7 → Boss-Extrude5 (add, up to next)
    with BuildSketch(Plane.XZ.offset(-48.176932074), mode=Mode.PRIVATE) as boss_extrude5_sk1:
        with Locations((12.870767082, 31.757461772)):
            Circle(SKETCH7_R)
    boss_extrude5_tool1 = extrude(boss_extrude5_sk1.sketch, amount=-BOSS_EXTRUDE5_REACH, mode=Mode.PRIVATE) - part.part
    # Sketch7 → Boss-Extrude5 (add, up to next)
    with BuildSketch(Plane.XZ.offset(-48.176932074), mode=Mode.PRIVATE) as boss_extrude5_sk2:
        with Locations((68.132943539, 49.074850698)):
            Circle(SKETCH7_R)
    boss_extrude5_tool2 = extrude(boss_extrude5_sk2.sketch, amount=-BOSS_EXTRUDE5_REACH, mode=Mode.PRIVATE) - part.part
    add(boss_extrude5_tool1.solids().sort_by_distance((12.870767, 48.176932, 31.757462))[0])
    add(boss_extrude5_tool2.solids().sort_by_distance((68.132944, 48.176932, 49.074851))[0])

    # Sketch7<3> → Cut-Extrude2 (cut)
    with BuildSketch(Plane.XZ.offset(-48.176932074)):
        with Locations(Location((12.870767082, 31.757461772, 0), (0, 0, 270))):
            Circle(SKETCH7_3_R)
        with Locations(Location((68.132943539, 49.074850698, 0), (0, 0, 270))):
            Circle(SKETCH7_3_R)
    extrude(amount=-CUT_EXTRUDE2_DEPTH, mode=Mode.SUBTRACT)

    # Sketch8 → Cut-Extrude3 (cut)
    with BuildSketch(Plane.XZ.offset(-54.526932074)):
        with Locations(Location((12.870767082, 31.757461772, 0), (0, 0, 270))):
            Circle(SKETCH8_R)
    extrude(amount=-CUT_EXTRUDE3_DEPTH, mode=Mode.SUBTRACT)

    # Sketch8<3> → Cut-Extrude4 (cut)
    with BuildSketch(Plane.XZ.offset(-54.526932074)):
        with Locations(Location((68.132943539, 49.074850698, 0), (0, 0, 270))):
            Circle(SKETCH8_3_R)
    extrude(amount=-CUT_EXTRUDE4_DEPTH, mode=Mode.SUBTRACT)

    # Sketch10 → Cut-Revolve1 (revolve, cut)
    with BuildSketch(Plane(origin=(68.132943539, 0, 0), x_dir=(0, -1, 0), z_dir=(-1, 0, 0)), mode=Mode.PRIVATE) as cut_revolve1_sk:
        Polygon((-54.526932074, 50.75517437), (-48.176932074, 51.874850698), (-48.176932074, 49.074850698), (-54.526932074, 49.074850698), align=None)
    revolve(cut_revolve1_sk.sketch.rotate(Axis((68.132943539, 54.526932074, 49.074850698), (0, -1, 0)), 180), axis=Axis((68.132943539, 54.526932074, 49.074850698), (0, -1, 0)), mode=Mode.SUBTRACT)

    # Sketch11 → Cut-Revolve2 (revolve, cut)
    with BuildSketch(Plane(origin=(12.870767082, 0, 0), x_dir=(0, -1, 0), z_dir=(-1, 0, 0)), mode=Mode.PRIVATE) as cut_revolve2_sk:
        Polygon((-54.526932074, 33.437785445), (-48.176932074, 34.557461772), (-48.176932074, 31.757461772), (-54.526932074, 31.757461772), align=None)
    revolve(cut_revolve2_sk.sketch.rotate(Axis((12.870767082, 54.526932074, 31.757461772), (0, -1, 0)), 180), axis=Axis((12.870767082, 54.526932074, 31.757461772), (0, -1, 0)), mode=Mode.SUBTRACT)


solid = part.part
